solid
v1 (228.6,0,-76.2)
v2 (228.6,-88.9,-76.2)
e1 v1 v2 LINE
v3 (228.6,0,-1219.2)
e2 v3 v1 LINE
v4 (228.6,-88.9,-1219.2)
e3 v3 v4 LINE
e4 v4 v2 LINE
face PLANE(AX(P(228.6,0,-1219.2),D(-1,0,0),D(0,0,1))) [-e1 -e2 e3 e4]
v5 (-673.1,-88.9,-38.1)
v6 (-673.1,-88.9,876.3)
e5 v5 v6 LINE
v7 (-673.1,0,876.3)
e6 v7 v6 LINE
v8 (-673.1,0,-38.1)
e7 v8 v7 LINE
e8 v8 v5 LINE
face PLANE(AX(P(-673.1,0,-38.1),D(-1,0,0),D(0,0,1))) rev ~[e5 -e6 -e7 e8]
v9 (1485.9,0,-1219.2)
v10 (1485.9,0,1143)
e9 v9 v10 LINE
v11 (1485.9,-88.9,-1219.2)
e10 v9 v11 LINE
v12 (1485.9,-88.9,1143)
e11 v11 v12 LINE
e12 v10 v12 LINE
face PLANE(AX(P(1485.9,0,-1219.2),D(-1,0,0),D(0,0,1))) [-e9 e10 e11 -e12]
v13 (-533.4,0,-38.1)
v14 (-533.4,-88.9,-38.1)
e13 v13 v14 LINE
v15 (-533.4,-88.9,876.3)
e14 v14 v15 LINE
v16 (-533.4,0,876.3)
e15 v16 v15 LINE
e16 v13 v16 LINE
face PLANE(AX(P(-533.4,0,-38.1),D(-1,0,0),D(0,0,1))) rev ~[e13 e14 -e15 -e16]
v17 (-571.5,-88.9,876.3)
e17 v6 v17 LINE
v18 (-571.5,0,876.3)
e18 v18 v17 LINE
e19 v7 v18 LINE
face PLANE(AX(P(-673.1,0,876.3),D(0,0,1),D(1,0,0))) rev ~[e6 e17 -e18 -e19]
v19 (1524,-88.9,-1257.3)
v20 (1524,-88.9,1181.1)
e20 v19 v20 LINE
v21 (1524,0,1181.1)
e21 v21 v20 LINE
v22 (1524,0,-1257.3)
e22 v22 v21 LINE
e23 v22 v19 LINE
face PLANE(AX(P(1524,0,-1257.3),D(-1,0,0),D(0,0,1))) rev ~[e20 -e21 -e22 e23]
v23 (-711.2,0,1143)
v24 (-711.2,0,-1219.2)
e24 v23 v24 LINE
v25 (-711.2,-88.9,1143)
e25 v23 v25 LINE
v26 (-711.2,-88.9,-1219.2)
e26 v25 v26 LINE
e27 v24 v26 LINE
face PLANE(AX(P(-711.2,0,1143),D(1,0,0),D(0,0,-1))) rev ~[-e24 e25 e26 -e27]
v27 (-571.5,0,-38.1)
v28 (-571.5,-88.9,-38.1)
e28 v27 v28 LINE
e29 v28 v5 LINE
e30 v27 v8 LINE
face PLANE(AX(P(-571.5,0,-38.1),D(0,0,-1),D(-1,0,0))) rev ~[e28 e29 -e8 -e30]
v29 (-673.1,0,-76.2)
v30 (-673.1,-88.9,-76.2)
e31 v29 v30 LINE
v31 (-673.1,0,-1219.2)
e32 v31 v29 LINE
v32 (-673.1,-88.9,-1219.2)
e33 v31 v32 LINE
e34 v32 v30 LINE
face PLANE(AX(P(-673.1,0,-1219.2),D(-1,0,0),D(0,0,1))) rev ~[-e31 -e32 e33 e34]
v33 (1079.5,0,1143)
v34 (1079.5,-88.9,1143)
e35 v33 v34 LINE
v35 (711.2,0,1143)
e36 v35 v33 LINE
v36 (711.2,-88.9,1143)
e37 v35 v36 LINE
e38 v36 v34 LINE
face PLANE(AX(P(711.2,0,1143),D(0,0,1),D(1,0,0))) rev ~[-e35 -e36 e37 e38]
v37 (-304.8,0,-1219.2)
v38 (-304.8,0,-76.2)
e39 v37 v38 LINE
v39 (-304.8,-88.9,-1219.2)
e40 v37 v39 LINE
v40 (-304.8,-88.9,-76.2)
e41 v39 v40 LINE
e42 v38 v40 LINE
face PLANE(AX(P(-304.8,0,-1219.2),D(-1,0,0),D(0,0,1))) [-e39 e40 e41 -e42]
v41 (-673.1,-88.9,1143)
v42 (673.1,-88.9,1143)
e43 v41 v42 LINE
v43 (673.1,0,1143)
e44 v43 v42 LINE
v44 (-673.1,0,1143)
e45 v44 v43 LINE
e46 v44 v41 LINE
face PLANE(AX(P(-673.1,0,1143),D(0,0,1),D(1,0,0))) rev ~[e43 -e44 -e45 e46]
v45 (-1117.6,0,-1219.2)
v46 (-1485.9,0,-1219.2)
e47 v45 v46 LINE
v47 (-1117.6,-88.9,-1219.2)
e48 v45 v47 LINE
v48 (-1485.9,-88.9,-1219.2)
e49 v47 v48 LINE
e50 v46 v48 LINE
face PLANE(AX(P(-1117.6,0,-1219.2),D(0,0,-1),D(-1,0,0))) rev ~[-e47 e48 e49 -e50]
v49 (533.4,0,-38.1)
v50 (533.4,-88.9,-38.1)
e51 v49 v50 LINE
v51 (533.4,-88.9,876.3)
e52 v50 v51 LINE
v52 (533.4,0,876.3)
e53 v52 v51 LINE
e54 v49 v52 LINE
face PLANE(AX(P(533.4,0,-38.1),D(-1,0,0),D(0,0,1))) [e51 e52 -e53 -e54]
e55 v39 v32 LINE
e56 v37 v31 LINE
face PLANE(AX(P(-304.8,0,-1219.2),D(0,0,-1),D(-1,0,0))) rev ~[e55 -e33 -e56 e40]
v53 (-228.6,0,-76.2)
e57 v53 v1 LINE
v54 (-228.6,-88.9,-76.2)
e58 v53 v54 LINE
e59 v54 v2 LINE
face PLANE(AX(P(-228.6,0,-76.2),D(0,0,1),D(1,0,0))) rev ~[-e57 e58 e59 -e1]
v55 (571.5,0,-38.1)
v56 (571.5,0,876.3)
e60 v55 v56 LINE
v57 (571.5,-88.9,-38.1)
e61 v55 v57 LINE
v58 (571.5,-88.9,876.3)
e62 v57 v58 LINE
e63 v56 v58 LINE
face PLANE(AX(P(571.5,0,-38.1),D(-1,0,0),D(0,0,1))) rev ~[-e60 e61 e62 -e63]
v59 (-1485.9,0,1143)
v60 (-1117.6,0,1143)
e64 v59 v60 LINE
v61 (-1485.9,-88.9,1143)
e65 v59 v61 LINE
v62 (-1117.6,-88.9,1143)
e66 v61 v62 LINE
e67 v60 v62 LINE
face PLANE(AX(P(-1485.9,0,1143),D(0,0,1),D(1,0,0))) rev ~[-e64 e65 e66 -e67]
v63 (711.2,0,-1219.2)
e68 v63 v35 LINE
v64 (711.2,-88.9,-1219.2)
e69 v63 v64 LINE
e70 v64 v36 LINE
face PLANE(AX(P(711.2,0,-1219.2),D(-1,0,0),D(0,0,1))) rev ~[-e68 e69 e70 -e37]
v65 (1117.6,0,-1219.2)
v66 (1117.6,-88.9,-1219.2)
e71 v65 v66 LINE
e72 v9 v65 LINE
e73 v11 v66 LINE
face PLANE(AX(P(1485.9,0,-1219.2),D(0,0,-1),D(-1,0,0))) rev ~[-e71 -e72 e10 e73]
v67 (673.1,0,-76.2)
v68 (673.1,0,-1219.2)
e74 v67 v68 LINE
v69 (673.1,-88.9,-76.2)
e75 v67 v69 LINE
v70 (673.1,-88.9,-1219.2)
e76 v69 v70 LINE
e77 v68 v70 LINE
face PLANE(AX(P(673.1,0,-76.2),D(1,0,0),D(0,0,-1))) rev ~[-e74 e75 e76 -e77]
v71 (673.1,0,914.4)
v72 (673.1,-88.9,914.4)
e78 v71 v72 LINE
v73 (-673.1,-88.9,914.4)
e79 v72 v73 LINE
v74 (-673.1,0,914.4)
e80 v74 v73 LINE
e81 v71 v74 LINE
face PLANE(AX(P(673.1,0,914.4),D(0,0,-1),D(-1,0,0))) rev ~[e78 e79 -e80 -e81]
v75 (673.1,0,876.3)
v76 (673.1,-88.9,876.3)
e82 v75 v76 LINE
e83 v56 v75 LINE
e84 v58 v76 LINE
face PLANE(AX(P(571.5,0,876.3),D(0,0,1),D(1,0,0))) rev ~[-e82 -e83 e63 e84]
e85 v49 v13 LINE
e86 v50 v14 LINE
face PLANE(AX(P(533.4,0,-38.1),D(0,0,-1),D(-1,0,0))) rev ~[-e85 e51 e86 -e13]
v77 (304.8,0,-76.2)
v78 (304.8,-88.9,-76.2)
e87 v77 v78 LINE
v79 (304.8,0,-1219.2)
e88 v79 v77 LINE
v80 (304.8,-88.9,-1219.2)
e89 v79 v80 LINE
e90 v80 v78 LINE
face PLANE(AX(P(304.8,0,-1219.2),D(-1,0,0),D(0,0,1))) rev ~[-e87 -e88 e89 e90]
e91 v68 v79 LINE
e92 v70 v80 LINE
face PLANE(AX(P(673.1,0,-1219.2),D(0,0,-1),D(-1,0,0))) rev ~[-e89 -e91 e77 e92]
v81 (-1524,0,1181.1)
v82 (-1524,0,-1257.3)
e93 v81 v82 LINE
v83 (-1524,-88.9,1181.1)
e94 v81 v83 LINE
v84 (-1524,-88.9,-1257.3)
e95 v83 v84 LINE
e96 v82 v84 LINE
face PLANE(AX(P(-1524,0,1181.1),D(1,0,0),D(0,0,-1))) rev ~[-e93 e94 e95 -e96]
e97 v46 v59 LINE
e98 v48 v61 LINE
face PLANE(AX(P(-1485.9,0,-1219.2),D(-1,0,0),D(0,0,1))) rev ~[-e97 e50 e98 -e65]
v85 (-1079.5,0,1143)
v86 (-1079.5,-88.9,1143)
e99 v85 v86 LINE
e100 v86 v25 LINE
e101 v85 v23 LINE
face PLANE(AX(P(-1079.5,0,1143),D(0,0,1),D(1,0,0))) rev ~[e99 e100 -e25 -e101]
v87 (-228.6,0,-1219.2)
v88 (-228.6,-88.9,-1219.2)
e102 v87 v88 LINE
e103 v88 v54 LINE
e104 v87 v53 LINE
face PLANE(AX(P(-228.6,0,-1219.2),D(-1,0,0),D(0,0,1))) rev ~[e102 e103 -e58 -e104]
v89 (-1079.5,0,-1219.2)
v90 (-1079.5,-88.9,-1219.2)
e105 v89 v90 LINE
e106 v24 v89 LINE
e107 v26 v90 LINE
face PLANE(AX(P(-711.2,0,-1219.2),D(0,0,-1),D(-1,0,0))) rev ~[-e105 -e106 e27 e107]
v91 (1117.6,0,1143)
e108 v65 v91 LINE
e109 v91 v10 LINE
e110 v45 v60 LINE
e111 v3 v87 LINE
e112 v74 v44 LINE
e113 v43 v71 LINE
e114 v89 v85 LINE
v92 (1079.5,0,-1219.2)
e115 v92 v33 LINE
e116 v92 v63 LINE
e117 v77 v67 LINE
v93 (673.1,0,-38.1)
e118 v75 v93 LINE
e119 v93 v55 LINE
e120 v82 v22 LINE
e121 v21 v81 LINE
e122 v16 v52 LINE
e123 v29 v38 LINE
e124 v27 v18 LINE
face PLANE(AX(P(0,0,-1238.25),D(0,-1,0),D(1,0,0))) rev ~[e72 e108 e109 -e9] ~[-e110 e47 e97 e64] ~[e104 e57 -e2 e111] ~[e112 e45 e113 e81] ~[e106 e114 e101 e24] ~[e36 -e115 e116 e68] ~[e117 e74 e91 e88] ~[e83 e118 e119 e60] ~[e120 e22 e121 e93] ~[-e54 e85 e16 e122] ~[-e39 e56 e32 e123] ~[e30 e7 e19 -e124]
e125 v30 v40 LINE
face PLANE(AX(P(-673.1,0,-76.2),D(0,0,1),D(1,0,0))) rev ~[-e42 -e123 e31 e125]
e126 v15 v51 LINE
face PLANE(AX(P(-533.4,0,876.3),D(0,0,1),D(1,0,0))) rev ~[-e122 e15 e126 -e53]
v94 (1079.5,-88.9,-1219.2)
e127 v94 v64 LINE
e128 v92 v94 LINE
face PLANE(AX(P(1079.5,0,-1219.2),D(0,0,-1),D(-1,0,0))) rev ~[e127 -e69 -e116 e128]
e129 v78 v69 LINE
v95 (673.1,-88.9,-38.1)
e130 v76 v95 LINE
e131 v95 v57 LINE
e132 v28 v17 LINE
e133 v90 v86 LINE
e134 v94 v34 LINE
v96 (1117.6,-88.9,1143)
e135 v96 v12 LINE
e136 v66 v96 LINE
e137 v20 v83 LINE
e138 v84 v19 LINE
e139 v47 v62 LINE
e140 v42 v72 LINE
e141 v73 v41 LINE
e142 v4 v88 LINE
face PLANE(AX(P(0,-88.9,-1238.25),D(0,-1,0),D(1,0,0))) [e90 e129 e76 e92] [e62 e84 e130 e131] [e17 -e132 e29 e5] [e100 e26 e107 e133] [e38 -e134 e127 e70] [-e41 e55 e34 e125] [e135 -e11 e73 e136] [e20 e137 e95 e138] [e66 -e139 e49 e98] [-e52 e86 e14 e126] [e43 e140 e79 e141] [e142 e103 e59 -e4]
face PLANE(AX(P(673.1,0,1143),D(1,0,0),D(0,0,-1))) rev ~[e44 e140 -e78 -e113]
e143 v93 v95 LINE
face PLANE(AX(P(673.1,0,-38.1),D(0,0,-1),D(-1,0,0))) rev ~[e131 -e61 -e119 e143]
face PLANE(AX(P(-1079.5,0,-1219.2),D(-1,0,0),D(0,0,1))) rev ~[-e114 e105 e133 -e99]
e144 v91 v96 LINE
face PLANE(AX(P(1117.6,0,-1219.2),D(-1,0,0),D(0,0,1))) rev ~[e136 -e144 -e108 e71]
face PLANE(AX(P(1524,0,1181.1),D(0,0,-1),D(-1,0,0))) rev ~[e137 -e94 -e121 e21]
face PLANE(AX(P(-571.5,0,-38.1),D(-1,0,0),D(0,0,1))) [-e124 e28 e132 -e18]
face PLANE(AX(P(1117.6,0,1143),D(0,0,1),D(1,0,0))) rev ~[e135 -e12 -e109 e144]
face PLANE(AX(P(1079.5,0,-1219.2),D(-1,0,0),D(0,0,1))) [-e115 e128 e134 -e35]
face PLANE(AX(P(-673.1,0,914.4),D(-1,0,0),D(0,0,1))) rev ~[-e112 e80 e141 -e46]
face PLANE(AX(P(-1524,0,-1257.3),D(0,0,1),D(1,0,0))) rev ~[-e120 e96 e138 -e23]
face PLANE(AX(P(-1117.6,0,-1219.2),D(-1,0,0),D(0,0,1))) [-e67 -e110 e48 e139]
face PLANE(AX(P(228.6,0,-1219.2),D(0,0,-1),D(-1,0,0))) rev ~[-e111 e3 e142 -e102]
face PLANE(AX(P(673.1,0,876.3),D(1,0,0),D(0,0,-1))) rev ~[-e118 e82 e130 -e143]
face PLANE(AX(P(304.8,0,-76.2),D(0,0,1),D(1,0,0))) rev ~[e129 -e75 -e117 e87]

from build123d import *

# Parameters (mm, degrees)
F0_W     = 38.1
F0_H     = 2362.2
F0_H_2   = 1143
F0_H_3   = 914.4
F1_DEPTH = 88.9


# Not quite as in the source:
# - a feature names something its author has since deleted; it is built from what else it names


with BuildPart() as f1:
    # F0 (on Front) → F1 (new body)
    with BuildSketch(Plane.XZ):
        Polygon((1524, -1219.2), (1485.9, -1219.2), (1117.6, -1219.2), (1079.5, -1219.2), (711.2, -1219.2), (673.1, -1219.2), (304.8, -1219.2), (266.7, -1219.2), (228.6, -1219.2), (0, -1219.2), (-228.6, -1219.2), (-266.7, -1219.2), (-304.8, -1219.2), (-673.1, -1219.2), (-711.2, -1219.2), (-1079.5, -1219.2), (-1117.6, -1219.2), (-1485.9, -1219.2), (-1524, -1219.2), (-1524, -1257.3), (1524, -1257.3), align=None)
        with Locations((1504.95, -38.1)):
            Rectangle(F0_W, F0_H)
        with Locations((1098.55, -38.1)):
            Rectangle(F0_W, F0_H)
        Polygon((1117.6, 1143), (1485.9, 1143), (1524, 1143), (1524, 1181.1), (-1524, 1181.1), (-1524, 1143), (-1485.9, 1143), (-1117.6, 1143), (-1079.5, 1143), (-711.2, 1143), (-673.1, 1143), (673.1, 1143), (711.2, 1143), (1079.5, 1143), align=None)
        Polygon((673.1, -1219.2), (711.2, -1219.2), (711.2, 1143), (673.1, 1143), (673.1, 914.4), (673.1, 876.3), (673.1, -38.1), (673.1, -76.2), align=None)
        with Locations((-1504.95, -38.1)):
            Rectangle(F0_W, F0_H)
        with Locations((285.75, -647.7)):
            Rectangle(F0_W, F0_H_2)
        Polygon((304.8, -76.2), (673.1, -76.2), (673.1, -38.1), (571.5, -38.1), (533.4, -38.1), (-533.4, -38.1), (-571.5, -38.1), (-673.1, -38.1), (-673.1, -76.2), (-304.8, -76.2), (-266.7, -76.2), (-228.6, -76.2), (228.6, -76.2), (266.7, -76.2), align=None)
        with Locations((247.65, -647.7)):
            Rectangle(F0_W, F0_H_2)
        Polygon((673.1, 876.3), (673.1, 914.4), (-673.1, 914.4), (-673.1, 876.3), (-571.5, 876.3), (-533.4, 876.3), (533.4, 876.3), (571.5, 876.3), align=None)
        Polygon((-673.1, 914.4), (-673.1, 1143), (-711.2, 1143), (-711.2, -1219.2), (-673.1, -1219.2), (-673.1, -76.2), (-673.1, -38.1), (-673.1, 876.3), align=None)
        with Locations((-1098.55, -38.1)):
            Rectangle(F0_W, F0_H)
        with Locations((552.45, 419.1)):
            Rectangle(F0_W, F0_H_3)
        with Locations((-247.65, -647.7)):
            Rectangle(F0_W, F0_H_2)
        with Locations((-552.45, 419.1)):
            Rectangle(F0_W, F0_H_3)
        with Locations((-285.75, -647.7)):
            Rectangle(F0_W, F0_H_2)
    extrude(amount=F1_DEPTH)


solid = f1.part
